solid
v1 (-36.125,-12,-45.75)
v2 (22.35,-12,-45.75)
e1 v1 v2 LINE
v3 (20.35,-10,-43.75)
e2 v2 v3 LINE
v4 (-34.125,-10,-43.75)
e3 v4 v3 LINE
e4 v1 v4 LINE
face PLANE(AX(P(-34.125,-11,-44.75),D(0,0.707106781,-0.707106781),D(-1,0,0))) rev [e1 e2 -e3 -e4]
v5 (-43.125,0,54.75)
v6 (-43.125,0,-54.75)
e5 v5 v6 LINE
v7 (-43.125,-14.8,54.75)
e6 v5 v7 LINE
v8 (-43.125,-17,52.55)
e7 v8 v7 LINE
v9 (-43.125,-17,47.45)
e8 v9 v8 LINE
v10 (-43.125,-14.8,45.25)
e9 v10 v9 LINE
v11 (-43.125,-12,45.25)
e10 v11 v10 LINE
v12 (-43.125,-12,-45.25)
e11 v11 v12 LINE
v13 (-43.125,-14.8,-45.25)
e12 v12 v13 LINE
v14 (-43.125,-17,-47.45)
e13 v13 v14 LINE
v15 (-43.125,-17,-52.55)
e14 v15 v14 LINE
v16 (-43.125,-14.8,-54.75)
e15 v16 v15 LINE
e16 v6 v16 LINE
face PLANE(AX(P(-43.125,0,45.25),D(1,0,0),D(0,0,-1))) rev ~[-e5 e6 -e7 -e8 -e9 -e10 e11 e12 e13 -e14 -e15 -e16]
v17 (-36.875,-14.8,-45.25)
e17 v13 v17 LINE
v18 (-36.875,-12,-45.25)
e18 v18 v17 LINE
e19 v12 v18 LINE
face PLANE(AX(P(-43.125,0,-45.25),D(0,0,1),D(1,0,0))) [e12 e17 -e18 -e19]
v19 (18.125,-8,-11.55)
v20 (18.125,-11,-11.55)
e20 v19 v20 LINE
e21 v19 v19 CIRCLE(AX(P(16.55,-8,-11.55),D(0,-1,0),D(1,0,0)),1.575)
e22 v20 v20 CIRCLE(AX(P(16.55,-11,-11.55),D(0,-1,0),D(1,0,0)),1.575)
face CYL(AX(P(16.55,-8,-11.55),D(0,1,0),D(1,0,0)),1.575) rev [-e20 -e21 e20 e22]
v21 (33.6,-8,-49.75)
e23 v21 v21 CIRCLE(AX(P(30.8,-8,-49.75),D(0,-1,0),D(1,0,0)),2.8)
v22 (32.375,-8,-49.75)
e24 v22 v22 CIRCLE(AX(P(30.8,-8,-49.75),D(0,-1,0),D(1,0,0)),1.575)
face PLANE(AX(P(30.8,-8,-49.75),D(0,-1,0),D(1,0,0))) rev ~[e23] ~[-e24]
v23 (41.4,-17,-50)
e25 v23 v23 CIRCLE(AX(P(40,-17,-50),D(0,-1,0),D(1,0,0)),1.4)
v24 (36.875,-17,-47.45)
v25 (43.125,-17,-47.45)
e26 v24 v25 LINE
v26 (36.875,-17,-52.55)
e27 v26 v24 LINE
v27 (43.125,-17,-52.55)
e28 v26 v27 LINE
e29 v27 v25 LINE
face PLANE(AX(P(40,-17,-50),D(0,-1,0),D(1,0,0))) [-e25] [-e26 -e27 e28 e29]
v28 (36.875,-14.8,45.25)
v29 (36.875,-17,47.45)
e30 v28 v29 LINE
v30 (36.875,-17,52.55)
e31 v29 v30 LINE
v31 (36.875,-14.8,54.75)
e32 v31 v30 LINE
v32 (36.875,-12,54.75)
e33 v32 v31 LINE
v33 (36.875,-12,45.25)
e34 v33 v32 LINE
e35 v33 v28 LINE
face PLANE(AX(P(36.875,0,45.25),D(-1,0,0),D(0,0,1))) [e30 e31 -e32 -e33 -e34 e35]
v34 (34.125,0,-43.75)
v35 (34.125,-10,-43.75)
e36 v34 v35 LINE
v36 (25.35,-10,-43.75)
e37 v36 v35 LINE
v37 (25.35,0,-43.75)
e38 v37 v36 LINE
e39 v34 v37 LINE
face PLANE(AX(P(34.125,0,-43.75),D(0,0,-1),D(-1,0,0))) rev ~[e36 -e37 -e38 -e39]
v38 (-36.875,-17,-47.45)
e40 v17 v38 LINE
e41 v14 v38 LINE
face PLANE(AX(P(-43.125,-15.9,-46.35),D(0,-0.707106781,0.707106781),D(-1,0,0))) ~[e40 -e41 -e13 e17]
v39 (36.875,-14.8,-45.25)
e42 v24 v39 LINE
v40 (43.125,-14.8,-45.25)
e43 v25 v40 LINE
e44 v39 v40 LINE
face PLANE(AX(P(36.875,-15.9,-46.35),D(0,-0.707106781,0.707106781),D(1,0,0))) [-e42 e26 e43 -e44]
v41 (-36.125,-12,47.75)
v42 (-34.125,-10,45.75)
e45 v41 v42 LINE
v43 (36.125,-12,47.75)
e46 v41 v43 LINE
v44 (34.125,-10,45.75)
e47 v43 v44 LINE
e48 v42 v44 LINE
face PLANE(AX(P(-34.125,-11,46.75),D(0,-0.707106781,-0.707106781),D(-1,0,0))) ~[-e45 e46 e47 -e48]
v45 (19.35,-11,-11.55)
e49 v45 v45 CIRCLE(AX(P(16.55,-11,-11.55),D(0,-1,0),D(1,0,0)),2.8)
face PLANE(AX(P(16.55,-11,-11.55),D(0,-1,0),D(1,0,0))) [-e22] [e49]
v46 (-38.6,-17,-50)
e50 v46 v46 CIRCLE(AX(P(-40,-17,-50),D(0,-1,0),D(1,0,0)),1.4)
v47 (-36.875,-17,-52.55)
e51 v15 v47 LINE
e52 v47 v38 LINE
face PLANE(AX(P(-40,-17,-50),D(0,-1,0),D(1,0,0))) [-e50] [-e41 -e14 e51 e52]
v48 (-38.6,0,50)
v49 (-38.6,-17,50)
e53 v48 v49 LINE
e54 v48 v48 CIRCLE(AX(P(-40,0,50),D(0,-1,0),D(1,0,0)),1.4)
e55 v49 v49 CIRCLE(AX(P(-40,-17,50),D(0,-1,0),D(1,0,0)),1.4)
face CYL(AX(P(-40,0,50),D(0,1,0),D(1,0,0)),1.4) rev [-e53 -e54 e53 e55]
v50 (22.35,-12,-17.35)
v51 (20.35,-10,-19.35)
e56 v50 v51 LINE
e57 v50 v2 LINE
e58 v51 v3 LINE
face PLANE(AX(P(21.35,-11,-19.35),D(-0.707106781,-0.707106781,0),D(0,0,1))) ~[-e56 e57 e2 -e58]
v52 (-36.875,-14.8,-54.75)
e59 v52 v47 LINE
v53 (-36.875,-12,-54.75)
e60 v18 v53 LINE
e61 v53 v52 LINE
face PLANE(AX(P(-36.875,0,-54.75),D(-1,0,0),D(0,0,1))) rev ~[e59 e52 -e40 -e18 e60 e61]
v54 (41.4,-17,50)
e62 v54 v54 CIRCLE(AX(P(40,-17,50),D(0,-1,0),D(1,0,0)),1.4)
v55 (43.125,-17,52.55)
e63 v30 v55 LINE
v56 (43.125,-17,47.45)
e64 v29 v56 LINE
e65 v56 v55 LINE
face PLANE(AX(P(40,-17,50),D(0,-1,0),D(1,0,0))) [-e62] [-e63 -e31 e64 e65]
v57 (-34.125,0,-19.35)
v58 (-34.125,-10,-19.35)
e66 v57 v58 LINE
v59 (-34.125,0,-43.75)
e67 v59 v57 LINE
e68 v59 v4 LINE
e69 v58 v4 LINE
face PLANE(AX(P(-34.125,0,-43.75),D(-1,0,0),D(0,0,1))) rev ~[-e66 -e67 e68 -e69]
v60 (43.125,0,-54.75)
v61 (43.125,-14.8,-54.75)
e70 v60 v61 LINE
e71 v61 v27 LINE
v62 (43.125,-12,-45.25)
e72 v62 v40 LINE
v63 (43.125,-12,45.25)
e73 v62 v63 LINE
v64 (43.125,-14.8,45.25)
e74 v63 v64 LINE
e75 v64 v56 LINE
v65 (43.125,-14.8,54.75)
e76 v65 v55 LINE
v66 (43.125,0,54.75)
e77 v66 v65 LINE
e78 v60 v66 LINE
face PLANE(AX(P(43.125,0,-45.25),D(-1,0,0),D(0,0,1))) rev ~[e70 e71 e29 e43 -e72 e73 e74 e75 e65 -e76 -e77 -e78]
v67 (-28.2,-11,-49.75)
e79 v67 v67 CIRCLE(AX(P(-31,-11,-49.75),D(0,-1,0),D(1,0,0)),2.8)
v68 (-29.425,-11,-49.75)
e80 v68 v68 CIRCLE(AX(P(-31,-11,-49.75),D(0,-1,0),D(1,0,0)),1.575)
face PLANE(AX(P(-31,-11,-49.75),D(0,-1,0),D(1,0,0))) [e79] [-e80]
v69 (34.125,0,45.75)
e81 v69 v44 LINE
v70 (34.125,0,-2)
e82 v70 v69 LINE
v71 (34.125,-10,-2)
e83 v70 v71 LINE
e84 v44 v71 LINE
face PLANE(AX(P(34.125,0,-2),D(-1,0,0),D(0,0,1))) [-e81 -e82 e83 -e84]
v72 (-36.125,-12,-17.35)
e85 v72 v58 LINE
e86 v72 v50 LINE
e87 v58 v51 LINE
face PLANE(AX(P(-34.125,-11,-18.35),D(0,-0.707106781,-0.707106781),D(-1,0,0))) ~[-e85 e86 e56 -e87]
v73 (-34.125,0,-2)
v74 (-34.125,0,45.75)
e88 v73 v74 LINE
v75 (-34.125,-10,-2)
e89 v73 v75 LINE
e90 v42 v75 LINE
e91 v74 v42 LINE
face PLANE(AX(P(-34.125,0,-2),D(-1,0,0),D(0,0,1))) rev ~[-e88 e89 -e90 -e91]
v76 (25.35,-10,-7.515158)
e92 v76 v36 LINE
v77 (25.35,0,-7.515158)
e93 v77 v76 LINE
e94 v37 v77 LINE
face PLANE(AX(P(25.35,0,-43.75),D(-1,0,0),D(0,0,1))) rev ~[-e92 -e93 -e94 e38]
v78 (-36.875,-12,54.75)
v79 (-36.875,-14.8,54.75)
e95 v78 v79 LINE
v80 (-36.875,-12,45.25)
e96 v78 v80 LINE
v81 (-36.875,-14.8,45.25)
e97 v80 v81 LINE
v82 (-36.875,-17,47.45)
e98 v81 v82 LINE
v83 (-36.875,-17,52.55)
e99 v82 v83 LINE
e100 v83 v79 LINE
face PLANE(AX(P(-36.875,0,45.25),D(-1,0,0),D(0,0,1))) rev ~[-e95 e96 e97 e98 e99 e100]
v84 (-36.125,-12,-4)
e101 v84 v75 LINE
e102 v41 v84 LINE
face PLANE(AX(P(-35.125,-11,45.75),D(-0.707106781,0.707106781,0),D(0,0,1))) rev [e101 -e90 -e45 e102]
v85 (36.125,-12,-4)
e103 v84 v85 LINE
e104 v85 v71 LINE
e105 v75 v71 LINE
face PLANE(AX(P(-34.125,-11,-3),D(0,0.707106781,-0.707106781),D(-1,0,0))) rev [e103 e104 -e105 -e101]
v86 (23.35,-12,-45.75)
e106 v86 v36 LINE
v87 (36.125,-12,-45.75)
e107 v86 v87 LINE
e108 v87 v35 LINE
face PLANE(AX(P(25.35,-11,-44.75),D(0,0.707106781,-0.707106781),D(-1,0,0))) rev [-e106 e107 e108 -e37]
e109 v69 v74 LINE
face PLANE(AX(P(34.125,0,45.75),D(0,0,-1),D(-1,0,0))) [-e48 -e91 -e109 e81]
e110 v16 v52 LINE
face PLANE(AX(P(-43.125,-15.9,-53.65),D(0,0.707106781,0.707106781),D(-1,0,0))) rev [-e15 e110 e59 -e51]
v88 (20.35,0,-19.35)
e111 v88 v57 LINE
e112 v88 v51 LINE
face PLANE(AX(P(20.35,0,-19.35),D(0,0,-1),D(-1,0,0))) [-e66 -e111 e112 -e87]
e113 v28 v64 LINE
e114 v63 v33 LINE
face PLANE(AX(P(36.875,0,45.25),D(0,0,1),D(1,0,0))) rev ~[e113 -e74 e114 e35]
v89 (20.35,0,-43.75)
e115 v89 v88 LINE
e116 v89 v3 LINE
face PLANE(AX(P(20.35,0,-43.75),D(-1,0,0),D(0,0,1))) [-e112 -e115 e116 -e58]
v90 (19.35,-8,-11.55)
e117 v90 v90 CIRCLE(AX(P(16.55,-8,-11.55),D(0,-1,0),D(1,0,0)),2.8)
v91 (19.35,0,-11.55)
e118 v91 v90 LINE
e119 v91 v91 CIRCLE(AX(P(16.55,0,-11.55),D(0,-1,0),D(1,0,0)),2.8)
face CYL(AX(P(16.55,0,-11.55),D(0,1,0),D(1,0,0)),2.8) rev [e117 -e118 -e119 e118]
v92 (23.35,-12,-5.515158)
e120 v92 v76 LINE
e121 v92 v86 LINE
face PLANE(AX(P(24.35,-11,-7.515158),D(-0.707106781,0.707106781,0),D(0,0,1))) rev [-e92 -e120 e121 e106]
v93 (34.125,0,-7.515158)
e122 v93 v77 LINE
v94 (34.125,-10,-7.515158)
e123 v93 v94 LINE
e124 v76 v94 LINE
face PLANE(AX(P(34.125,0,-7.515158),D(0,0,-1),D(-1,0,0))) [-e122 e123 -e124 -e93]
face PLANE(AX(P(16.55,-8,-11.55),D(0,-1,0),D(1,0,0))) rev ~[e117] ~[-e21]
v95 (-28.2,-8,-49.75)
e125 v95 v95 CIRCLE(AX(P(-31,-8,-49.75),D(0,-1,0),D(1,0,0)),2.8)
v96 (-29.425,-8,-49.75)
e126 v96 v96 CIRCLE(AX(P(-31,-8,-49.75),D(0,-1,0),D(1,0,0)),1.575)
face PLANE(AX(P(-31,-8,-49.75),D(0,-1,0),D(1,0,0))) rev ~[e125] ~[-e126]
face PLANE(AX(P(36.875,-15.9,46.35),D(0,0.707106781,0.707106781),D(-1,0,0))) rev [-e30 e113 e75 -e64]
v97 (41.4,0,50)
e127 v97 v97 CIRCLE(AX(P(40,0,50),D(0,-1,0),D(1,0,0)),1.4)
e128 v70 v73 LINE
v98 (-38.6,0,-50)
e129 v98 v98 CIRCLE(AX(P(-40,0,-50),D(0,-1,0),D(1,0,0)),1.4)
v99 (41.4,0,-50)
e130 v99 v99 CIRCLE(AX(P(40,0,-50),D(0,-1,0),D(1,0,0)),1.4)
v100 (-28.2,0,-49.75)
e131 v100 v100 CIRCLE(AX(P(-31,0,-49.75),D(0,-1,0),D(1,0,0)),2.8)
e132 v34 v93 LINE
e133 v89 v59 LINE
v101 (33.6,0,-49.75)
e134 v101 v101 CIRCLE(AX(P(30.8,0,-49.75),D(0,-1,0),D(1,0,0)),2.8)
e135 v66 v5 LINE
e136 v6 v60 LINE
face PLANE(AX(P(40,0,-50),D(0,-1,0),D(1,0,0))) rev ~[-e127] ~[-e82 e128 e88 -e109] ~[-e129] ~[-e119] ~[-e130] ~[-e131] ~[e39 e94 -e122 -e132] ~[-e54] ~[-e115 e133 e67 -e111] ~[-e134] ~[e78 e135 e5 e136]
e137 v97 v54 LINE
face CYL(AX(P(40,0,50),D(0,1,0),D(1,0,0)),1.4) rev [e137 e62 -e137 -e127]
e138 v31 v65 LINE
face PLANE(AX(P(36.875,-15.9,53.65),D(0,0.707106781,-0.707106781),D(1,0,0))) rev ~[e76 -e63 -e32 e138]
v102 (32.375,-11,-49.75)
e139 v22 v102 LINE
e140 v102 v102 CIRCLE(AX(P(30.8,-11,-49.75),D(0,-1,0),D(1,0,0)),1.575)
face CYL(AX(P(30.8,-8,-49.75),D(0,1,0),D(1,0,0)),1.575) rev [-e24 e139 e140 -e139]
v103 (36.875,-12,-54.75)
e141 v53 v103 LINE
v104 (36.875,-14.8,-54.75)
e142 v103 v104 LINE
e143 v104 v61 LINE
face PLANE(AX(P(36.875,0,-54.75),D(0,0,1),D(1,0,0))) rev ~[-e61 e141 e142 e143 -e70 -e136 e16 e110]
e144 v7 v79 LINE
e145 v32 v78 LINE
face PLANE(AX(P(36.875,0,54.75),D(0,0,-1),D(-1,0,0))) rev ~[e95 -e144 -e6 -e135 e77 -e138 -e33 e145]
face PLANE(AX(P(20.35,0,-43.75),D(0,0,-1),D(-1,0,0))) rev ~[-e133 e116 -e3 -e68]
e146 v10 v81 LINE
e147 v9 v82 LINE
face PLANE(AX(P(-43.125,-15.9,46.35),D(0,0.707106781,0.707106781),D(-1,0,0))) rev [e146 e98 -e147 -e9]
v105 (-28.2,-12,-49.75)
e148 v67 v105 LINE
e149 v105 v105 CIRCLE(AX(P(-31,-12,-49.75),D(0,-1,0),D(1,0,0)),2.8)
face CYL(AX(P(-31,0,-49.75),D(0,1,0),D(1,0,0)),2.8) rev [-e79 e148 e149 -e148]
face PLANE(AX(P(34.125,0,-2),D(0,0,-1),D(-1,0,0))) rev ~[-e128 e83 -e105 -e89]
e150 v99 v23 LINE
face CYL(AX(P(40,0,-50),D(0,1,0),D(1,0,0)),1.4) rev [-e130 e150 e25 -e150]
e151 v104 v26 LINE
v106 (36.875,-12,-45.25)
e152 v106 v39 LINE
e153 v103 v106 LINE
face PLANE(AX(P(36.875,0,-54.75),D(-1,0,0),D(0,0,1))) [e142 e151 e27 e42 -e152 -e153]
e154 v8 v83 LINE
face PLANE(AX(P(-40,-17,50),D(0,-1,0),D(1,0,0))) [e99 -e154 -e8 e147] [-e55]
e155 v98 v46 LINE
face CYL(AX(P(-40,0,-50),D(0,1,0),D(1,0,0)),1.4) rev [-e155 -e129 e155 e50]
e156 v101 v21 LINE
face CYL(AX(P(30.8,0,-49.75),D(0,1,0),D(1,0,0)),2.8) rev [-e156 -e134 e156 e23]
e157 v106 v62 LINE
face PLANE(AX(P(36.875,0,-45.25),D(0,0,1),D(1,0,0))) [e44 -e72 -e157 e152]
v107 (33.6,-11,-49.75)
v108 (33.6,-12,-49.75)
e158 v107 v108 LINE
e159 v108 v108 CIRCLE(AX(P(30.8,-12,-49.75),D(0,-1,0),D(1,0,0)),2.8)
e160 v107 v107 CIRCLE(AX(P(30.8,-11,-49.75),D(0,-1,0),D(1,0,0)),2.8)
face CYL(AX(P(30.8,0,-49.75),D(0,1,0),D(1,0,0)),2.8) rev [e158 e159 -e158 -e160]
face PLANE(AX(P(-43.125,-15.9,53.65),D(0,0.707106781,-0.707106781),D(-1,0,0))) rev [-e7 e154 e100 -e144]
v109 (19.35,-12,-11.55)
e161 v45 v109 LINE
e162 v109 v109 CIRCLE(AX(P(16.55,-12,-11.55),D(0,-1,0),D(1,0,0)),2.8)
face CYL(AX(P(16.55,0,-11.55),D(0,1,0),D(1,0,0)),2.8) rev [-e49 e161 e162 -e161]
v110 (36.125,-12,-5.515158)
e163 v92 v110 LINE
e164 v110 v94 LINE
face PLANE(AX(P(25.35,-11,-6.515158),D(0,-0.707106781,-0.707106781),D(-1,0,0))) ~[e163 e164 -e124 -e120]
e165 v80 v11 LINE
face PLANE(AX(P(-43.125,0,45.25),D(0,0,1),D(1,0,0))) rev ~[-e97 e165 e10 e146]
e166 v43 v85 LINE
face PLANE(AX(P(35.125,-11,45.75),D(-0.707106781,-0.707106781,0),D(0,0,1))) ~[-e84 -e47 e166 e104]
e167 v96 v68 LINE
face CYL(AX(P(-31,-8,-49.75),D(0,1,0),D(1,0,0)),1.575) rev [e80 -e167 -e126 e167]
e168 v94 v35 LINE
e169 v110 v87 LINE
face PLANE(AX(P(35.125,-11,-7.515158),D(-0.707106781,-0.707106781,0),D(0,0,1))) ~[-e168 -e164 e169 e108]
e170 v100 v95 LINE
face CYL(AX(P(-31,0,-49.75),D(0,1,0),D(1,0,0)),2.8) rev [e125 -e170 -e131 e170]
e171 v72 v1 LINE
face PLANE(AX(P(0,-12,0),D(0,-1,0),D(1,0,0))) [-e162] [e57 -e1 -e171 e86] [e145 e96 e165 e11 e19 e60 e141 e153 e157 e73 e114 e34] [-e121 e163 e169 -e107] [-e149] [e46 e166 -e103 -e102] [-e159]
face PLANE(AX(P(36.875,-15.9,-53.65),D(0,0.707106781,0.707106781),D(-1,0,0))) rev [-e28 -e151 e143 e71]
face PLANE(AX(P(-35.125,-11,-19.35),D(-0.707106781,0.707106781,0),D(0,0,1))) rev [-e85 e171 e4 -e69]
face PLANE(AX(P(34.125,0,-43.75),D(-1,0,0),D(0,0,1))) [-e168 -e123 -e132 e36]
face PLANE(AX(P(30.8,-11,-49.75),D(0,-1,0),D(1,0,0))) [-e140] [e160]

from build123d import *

# Parameters (mm, degrees)
F0_R     = 2.8
F1_DEPTH = 12
F0_W     = 6.25
F0_H     = 9.5
F0_R_2   = 1.4
F2_DEPTH = 17
F3_SIZE  = 2.2
F4_START = 8
F0_R_3   = 1.575
F4_DEPTH = 3
F5_W     = 68.25
F5_H     = 47.75
F5_W_2   = 8.775
F5_H_2   = 36.234842279
F5_W_3   = 54.475
F5_H_3   = 24.4
F6_DEPTH = 28
F7_SIZE  = 2


# Not quite as in the source:
# - a feature names something its author has since deleted; it is built from what else it names


with BuildPart() as f1:
    # F0 (on Front) → F1 (new body)
    with BuildSketch(Plane.XZ):
        Polygon((-36.875, -54.75), (36.875, -54.75), (36.875, -45.25), (43.125, -45.25), (43.125, 45.25), (36.875, 45.25), (36.875, 54.75), (-36.875, 54.75), (-36.875, 45.25), (-43.125, 45.25), (-43.125, -45.25), (-36.875, -45.25), align=None)
        with Locations((-31, -49.75)):
            Circle(F0_R, mode=Mode.SUBTRACT)
        with Locations((30.8, -49.75)):
            Circle(F0_R, mode=Mode.SUBTRACT)
        with Locations((16.55, -11.55)):
            Circle(F0_R, mode=Mode.SUBTRACT)
    extrude(amount=F1_DEPTH)

    # F0 (on Front) → F2 (join)
    with BuildSketch(Plane.XZ):
        with Locations((40, -50)):
            Rectangle(F0_W, F0_H)
        Polygon((40, -46.4492958445), (43.075, -48.2246479222), (43.075, -51.7753520778), (40, -53.5507041555), (36.925, -51.7753520778), (36.925, -48.2246479222), align=None, mode=Mode.SUBTRACT)
        with Locations((-40, -50)):
            Rectangle(F0_W, F0_H)
        Polygon((-40, -46.4492958445), (-36.925, -48.2246479222), (-36.925, -51.7753520778), (-40, -53.5507041555), (-43.075, -51.7753520778), (-43.075, -48.2246479222), align=None, mode=Mode.SUBTRACT)
        with Locations((-40, 50)):
            Rectangle(F0_W, F0_H)
        Polygon((-40, 53.5507041555), (-36.925, 51.7753520778), (-36.925, 48.2246479222), (-40, 46.4492958445), (-43.075, 48.2246479222), (-43.075, 51.7753520778), align=None, mode=Mode.SUBTRACT)
        with Locations((40, 50)):
            Rectangle(F0_W, F0_H)
        Polygon((40, 46.4492958445), (36.925, 48.2246479222), (36.925, 51.7753520778), (40, 53.5507041555), (43.075, 51.7753520778), (43.075, 48.2246479222), align=None, mode=Mode.SUBTRACT)
        Polygon((-36.925, -51.7753520778), (-36.925, -48.2246479222), (-40, -46.4492958445), (-43.075, -48.2246479222), (-43.075, -51.7753520778), (-40, -53.5507041555), align=None)
        with Locations((-40, -50)):
            Circle(F0_R_2, mode=Mode.SUBTRACT)
        Polygon((43.075, -51.7753520778), (43.075, -48.2246479222), (40, -46.4492958445), (36.925, -48.2246479222), (36.925, -51.7753520778), (40, -53.5507041555), align=None)
        with Locations((40, -50)):
            Circle(F0_R_2, mode=Mode.SUBTRACT)
        Polygon((36.925, 51.7753520778), (36.925, 48.2246479222), (40, 46.4492958445), (43.075, 48.2246479222), (43.075, 51.7753520778), (40, 53.5507041555), align=None)
        with Locations((40, 50)):
            Circle(F0_R_2, mode=Mode.SUBTRACT)
        Polygon((-36.925, 48.2246479222), (-36.925, 51.7753520778), (-40, 53.5507041555), (-43.075, 51.7753520778), (-43.075, 48.2246479222), (-40, 46.4492958445), align=None)
        with Locations((-40, 50)):
            Circle(F0_R_2, mode=Mode.SUBTRACT)
    extrude(amount=F2_DEPTH)

    # F3
    f3_edges = [f1.edges().sort_by_distance(p)[0] for p in [
        (-40, -17, -45.25),
        (-40, -17, -54.75),
        (40, -17, -45.25),
        (40, -17, -54.75),
        (-40, -17, 54.75),
        (-40, -17, 45.25),
        (40, -17, 54.75),
        (40, -17, 45.25),
    ]]
    chamfer(f3_edges, length=F3_SIZE)

    # F0 (on Front) → F4 (join)
    with BuildSketch(Plane.XZ.offset(F4_START)):
        with Locations((16.55, -11.55)):
            Circle(F0_R)
        with Locations((16.55, -11.55)):
            Circle(F0_R_3, mode=Mode.SUBTRACT)
        with Locations((30.8, -49.75)):
            Circle(F0_R)
        with Locations((30.8, -49.75)):
            Circle(F0_R_3, mode=Mode.SUBTRACT)
        with Locations((-31, -49.75)):
            Circle(F0_R)
        with Locations((-31, -49.75)):
            Circle(F0_R_3, mode=Mode.SUBTRACT)
    extrude(amount=F4_DEPTH)

    # F5 (on face) → F6 (cut)
    with BuildSketch(Plane(origin=(0, 0, 0), x_dir=(-1, 0, 0), z_dir=(0, 1, 0))):
        with Locations((0, 21.875)):
            Rectangle(F5_W, F5_H)
        with Locations((-29.7375, -25.6325788605)):
            Rectangle(F5_W_2, F5_H_2)
        with Locations((6.8875, -31.55)):
            Rectangle(F5_W_3, F5_H_3)
    extrude(amount=-F6_DEPTH, mode=Mode.SUBTRACT)

    # F7
    f7_edges = [f1.edges().sort_by_distance(p)[0] for p in [
        (0, -12, -2),
        (-34.125, -12, 21.875),
        (0, -12, 45.75),
        (34.125, -12, 21.875),
        (34.125, -12, -25.632579),
        (29.7375, -12, -7.515158),
        (25.35, -12, -25.632579),
        (29.7375, -12, -43.75),
        (-6.8875, -12, -43.75),
        (20.35, -12, -31.55),
        (-6.8875, -12, -19.35),
        (-34.125, -12, -31.55),
    ]]
    chamfer(f7_edges, length=F7_SIZE)


solid = f1.part
